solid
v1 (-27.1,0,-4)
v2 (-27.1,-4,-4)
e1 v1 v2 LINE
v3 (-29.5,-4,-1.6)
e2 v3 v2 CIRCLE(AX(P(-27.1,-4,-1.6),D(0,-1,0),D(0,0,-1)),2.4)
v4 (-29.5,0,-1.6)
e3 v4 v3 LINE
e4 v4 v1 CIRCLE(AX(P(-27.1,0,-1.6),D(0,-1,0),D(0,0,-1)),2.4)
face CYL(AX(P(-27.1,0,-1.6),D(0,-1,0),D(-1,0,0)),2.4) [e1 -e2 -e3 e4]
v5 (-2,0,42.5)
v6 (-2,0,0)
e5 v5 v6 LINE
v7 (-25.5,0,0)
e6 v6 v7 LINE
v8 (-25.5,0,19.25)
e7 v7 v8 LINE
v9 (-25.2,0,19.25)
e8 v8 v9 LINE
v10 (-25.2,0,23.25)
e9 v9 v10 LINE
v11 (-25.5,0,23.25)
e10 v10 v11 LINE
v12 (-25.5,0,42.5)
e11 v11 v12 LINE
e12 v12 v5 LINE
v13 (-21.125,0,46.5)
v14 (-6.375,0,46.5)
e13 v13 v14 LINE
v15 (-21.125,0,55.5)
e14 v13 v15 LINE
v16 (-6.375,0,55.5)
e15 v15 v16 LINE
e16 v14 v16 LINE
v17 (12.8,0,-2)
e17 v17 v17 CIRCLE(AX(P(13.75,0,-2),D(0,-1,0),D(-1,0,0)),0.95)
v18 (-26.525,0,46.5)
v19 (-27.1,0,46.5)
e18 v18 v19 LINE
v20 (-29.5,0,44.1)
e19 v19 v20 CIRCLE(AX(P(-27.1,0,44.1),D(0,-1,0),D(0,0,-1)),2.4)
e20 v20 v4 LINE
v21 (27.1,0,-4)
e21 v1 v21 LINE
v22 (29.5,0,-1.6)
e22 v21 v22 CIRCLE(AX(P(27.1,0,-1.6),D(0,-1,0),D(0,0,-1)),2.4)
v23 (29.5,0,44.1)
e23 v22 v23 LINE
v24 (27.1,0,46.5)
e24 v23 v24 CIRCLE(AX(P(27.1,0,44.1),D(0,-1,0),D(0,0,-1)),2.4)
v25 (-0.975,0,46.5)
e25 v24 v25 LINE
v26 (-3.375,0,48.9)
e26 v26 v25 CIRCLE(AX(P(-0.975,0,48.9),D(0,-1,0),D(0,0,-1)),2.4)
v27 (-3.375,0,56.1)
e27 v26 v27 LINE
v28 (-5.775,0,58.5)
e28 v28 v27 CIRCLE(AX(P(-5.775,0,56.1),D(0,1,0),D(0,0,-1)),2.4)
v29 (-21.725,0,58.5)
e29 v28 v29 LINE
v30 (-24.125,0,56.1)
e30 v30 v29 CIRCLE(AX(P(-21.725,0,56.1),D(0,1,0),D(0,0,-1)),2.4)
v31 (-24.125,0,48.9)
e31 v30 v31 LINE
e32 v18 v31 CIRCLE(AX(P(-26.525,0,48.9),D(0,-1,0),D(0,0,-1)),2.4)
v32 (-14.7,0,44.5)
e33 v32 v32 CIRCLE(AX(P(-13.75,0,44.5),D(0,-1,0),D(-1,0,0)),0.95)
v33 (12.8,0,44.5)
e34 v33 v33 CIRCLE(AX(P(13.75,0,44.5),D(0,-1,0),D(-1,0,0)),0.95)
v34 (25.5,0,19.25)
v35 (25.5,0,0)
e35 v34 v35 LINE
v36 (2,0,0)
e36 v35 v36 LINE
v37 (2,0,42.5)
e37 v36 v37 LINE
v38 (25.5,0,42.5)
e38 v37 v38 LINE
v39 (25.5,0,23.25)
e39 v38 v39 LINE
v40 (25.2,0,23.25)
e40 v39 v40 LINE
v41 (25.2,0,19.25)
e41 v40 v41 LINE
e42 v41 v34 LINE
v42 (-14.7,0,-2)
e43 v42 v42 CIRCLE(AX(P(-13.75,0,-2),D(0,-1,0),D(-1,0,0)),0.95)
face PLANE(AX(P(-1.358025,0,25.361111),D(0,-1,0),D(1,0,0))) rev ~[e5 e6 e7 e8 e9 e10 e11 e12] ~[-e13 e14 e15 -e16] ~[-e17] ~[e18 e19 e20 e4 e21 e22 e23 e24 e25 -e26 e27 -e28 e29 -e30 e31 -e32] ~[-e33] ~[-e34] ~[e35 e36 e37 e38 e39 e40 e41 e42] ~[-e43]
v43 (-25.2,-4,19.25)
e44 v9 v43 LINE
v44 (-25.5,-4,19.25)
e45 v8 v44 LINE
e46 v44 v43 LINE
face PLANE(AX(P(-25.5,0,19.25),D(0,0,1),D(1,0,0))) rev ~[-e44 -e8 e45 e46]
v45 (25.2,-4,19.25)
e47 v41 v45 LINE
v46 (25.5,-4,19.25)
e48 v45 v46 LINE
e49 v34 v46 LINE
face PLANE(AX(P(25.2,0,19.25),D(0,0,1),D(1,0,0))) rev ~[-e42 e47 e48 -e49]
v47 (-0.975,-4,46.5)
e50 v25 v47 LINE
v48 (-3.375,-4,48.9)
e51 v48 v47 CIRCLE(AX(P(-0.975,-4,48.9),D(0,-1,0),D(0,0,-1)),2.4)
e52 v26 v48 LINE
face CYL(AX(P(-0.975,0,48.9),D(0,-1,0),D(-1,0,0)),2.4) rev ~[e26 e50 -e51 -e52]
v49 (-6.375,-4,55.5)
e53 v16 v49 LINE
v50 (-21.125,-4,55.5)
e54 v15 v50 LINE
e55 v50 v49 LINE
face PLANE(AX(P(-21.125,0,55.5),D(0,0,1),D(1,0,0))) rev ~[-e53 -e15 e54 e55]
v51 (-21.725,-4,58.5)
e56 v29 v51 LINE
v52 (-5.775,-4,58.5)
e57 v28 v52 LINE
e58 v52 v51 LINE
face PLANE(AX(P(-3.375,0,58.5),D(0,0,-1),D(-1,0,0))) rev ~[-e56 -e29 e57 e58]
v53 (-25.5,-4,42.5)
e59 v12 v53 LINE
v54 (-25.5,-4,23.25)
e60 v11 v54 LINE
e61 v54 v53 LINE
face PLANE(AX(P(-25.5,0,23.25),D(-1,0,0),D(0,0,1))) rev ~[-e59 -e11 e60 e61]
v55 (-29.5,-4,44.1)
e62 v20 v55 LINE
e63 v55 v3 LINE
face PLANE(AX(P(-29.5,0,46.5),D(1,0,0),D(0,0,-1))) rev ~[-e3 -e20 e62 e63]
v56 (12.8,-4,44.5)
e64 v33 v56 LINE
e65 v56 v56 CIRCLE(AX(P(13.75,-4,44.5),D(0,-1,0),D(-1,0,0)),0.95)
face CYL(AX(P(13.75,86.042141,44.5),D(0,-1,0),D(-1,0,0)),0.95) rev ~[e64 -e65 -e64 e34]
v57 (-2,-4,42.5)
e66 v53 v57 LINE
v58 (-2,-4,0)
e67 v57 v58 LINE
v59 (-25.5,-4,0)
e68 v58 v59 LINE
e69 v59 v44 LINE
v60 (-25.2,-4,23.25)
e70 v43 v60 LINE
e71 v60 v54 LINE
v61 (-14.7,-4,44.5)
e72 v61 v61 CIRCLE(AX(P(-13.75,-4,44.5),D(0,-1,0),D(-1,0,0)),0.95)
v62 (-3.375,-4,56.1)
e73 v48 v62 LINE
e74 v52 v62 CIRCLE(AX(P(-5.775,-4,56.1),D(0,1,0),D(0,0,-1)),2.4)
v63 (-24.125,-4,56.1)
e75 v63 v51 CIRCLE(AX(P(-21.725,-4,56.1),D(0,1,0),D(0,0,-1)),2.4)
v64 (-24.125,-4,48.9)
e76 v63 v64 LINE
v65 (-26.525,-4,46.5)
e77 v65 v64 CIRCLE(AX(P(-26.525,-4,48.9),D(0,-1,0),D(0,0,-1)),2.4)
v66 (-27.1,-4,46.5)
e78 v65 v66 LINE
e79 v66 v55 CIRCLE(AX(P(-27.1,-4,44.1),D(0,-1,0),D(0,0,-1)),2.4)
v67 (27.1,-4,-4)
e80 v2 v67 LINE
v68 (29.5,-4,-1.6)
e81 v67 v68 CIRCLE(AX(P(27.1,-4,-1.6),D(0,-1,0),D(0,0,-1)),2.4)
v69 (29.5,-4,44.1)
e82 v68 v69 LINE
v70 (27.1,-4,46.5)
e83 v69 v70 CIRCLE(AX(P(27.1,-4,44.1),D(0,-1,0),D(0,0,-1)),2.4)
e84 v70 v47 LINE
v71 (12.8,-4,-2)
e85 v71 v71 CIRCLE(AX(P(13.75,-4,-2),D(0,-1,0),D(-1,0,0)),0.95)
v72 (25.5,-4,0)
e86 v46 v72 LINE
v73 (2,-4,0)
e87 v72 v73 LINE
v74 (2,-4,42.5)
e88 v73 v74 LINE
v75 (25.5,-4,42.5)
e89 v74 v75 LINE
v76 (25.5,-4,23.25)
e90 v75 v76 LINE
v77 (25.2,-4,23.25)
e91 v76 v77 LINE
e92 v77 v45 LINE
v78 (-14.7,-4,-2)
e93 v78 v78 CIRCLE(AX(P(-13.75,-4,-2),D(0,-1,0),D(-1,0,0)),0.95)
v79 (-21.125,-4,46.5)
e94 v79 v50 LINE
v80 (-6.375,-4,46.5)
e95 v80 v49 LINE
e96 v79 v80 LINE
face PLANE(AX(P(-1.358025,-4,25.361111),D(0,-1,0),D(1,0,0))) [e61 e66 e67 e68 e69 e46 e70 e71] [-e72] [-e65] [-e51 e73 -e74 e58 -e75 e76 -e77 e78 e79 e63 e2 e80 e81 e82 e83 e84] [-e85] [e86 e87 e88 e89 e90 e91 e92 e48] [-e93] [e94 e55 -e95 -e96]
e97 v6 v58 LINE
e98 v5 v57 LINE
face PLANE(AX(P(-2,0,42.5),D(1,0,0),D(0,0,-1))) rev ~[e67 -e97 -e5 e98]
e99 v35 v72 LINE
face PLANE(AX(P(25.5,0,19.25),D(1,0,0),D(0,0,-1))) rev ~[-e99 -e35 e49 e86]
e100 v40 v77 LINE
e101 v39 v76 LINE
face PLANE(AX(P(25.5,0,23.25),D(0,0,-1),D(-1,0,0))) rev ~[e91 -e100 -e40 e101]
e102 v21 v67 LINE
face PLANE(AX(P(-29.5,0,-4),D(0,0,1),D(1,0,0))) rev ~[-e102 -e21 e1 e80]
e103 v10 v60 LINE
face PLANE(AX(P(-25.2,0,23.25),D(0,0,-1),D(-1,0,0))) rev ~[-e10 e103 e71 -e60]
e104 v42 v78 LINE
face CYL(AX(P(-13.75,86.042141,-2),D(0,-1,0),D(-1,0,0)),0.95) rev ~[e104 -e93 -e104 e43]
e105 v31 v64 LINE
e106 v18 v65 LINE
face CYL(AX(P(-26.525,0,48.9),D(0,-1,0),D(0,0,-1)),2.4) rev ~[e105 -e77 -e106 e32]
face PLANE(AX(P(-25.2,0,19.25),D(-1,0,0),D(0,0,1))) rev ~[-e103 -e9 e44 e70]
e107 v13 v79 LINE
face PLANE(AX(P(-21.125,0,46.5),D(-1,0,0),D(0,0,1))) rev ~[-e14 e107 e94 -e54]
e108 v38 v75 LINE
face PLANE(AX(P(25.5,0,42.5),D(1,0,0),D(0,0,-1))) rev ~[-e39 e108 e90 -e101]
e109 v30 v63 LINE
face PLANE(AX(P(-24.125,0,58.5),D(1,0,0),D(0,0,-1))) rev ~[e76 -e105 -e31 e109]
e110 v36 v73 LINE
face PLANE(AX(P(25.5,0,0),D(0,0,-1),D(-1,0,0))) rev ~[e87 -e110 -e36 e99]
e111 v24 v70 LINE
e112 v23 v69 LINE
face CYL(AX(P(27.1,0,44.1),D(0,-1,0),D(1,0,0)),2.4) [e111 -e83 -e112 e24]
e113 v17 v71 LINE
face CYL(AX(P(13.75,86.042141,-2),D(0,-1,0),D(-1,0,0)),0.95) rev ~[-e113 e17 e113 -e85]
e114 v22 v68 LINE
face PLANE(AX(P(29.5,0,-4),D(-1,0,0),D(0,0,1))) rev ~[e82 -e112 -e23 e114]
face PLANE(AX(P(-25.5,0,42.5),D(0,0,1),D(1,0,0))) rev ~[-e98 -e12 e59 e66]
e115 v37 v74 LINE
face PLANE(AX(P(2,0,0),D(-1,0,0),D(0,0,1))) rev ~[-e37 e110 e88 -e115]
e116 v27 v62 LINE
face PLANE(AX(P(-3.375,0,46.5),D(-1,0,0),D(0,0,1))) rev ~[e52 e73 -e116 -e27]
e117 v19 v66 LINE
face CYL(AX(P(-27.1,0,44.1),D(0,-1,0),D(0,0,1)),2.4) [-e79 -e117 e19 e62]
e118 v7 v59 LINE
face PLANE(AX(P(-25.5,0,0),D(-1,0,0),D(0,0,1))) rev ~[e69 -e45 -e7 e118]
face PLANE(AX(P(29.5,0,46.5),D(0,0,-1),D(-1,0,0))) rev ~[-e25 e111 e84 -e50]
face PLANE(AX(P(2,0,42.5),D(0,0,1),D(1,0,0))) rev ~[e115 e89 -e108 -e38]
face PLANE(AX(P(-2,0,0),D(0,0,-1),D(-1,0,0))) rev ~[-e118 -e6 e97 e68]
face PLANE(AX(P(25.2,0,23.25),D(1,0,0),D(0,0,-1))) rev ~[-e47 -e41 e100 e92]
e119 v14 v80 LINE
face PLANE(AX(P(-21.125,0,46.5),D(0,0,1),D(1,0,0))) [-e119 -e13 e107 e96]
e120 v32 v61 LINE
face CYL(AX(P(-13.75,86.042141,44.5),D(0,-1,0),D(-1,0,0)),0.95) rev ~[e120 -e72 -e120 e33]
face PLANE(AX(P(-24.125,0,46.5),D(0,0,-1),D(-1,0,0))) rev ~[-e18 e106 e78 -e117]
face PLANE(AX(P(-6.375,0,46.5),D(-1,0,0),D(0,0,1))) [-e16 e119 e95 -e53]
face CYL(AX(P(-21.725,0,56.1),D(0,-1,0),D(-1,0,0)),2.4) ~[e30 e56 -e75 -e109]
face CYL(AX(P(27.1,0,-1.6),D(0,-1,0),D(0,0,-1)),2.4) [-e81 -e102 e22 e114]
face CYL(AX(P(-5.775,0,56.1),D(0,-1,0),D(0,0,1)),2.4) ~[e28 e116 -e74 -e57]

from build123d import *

# Parameters (mm, degrees)
F0_W     = 14.75
F0_H     = 9
F1_DEPTH = 4
F2_R     = 2.4
F3_D     = 1.9


with BuildPart() as f1:
    # F0 (on Front) → F1 (new body)
    with BuildSketch(Plane.XZ):
        Polygon((-24.125, 46.5), (-29.5, 46.5), (-29.5, -4), (29.5, -4), (29.5, 46.5), (-3.375, 46.5), (-3.375, 58.5), (-24.125, 58.5), align=None)
        Polygon((-2, 42.5), (-2, 0), (-25.5, 0), (-25.5, 19.25), (-25.2, 19.25), (-25.2, 23.25), (-25.5, 23.25), (-25.5, 42.5), align=None, mode=Mode.SUBTRACT)
        Polygon((25.5, 0), (2, 0), (2, 42.5), (25.5, 42.5), (25.5, 23.25), (25.2, 23.25), (25.2, 19.25), (25.5, 19.25), align=None, mode=Mode.SUBTRACT)
        with Locations((-13.75, 51)):
            Rectangle(F0_W, F0_H, mode=Mode.SUBTRACT)
    extrude(amount=F1_DEPTH)

    # F2
    f2_edges = [f1.edges().sort_by_distance(p)[0] for p in [
        (-24.125, -2, 58.5),
        (-24.125, -2, 46.5),
        (-29.5, -2, 46.5),
        (-3.375, -2, 58.5),
        (29.5, -2, 46.5),
        (-3.375, -2, 46.5),
        (29.5, -2, -4),
        (-29.5, -2, -4),
    ]]
    fillet(f2_edges, radius=F2_R)

    # F3 (through all)
    with Locations(Plane(origin=(0, 0, 0), x_dir=(1, 0, 0), z_dir=(0, 1, 0))):
        with Locations((-13.75, 2), (13.75, 2), (-13.75, -44.5), (13.75, -44.5)):
            Hole(F3_D / 2)


solid = f1.part
